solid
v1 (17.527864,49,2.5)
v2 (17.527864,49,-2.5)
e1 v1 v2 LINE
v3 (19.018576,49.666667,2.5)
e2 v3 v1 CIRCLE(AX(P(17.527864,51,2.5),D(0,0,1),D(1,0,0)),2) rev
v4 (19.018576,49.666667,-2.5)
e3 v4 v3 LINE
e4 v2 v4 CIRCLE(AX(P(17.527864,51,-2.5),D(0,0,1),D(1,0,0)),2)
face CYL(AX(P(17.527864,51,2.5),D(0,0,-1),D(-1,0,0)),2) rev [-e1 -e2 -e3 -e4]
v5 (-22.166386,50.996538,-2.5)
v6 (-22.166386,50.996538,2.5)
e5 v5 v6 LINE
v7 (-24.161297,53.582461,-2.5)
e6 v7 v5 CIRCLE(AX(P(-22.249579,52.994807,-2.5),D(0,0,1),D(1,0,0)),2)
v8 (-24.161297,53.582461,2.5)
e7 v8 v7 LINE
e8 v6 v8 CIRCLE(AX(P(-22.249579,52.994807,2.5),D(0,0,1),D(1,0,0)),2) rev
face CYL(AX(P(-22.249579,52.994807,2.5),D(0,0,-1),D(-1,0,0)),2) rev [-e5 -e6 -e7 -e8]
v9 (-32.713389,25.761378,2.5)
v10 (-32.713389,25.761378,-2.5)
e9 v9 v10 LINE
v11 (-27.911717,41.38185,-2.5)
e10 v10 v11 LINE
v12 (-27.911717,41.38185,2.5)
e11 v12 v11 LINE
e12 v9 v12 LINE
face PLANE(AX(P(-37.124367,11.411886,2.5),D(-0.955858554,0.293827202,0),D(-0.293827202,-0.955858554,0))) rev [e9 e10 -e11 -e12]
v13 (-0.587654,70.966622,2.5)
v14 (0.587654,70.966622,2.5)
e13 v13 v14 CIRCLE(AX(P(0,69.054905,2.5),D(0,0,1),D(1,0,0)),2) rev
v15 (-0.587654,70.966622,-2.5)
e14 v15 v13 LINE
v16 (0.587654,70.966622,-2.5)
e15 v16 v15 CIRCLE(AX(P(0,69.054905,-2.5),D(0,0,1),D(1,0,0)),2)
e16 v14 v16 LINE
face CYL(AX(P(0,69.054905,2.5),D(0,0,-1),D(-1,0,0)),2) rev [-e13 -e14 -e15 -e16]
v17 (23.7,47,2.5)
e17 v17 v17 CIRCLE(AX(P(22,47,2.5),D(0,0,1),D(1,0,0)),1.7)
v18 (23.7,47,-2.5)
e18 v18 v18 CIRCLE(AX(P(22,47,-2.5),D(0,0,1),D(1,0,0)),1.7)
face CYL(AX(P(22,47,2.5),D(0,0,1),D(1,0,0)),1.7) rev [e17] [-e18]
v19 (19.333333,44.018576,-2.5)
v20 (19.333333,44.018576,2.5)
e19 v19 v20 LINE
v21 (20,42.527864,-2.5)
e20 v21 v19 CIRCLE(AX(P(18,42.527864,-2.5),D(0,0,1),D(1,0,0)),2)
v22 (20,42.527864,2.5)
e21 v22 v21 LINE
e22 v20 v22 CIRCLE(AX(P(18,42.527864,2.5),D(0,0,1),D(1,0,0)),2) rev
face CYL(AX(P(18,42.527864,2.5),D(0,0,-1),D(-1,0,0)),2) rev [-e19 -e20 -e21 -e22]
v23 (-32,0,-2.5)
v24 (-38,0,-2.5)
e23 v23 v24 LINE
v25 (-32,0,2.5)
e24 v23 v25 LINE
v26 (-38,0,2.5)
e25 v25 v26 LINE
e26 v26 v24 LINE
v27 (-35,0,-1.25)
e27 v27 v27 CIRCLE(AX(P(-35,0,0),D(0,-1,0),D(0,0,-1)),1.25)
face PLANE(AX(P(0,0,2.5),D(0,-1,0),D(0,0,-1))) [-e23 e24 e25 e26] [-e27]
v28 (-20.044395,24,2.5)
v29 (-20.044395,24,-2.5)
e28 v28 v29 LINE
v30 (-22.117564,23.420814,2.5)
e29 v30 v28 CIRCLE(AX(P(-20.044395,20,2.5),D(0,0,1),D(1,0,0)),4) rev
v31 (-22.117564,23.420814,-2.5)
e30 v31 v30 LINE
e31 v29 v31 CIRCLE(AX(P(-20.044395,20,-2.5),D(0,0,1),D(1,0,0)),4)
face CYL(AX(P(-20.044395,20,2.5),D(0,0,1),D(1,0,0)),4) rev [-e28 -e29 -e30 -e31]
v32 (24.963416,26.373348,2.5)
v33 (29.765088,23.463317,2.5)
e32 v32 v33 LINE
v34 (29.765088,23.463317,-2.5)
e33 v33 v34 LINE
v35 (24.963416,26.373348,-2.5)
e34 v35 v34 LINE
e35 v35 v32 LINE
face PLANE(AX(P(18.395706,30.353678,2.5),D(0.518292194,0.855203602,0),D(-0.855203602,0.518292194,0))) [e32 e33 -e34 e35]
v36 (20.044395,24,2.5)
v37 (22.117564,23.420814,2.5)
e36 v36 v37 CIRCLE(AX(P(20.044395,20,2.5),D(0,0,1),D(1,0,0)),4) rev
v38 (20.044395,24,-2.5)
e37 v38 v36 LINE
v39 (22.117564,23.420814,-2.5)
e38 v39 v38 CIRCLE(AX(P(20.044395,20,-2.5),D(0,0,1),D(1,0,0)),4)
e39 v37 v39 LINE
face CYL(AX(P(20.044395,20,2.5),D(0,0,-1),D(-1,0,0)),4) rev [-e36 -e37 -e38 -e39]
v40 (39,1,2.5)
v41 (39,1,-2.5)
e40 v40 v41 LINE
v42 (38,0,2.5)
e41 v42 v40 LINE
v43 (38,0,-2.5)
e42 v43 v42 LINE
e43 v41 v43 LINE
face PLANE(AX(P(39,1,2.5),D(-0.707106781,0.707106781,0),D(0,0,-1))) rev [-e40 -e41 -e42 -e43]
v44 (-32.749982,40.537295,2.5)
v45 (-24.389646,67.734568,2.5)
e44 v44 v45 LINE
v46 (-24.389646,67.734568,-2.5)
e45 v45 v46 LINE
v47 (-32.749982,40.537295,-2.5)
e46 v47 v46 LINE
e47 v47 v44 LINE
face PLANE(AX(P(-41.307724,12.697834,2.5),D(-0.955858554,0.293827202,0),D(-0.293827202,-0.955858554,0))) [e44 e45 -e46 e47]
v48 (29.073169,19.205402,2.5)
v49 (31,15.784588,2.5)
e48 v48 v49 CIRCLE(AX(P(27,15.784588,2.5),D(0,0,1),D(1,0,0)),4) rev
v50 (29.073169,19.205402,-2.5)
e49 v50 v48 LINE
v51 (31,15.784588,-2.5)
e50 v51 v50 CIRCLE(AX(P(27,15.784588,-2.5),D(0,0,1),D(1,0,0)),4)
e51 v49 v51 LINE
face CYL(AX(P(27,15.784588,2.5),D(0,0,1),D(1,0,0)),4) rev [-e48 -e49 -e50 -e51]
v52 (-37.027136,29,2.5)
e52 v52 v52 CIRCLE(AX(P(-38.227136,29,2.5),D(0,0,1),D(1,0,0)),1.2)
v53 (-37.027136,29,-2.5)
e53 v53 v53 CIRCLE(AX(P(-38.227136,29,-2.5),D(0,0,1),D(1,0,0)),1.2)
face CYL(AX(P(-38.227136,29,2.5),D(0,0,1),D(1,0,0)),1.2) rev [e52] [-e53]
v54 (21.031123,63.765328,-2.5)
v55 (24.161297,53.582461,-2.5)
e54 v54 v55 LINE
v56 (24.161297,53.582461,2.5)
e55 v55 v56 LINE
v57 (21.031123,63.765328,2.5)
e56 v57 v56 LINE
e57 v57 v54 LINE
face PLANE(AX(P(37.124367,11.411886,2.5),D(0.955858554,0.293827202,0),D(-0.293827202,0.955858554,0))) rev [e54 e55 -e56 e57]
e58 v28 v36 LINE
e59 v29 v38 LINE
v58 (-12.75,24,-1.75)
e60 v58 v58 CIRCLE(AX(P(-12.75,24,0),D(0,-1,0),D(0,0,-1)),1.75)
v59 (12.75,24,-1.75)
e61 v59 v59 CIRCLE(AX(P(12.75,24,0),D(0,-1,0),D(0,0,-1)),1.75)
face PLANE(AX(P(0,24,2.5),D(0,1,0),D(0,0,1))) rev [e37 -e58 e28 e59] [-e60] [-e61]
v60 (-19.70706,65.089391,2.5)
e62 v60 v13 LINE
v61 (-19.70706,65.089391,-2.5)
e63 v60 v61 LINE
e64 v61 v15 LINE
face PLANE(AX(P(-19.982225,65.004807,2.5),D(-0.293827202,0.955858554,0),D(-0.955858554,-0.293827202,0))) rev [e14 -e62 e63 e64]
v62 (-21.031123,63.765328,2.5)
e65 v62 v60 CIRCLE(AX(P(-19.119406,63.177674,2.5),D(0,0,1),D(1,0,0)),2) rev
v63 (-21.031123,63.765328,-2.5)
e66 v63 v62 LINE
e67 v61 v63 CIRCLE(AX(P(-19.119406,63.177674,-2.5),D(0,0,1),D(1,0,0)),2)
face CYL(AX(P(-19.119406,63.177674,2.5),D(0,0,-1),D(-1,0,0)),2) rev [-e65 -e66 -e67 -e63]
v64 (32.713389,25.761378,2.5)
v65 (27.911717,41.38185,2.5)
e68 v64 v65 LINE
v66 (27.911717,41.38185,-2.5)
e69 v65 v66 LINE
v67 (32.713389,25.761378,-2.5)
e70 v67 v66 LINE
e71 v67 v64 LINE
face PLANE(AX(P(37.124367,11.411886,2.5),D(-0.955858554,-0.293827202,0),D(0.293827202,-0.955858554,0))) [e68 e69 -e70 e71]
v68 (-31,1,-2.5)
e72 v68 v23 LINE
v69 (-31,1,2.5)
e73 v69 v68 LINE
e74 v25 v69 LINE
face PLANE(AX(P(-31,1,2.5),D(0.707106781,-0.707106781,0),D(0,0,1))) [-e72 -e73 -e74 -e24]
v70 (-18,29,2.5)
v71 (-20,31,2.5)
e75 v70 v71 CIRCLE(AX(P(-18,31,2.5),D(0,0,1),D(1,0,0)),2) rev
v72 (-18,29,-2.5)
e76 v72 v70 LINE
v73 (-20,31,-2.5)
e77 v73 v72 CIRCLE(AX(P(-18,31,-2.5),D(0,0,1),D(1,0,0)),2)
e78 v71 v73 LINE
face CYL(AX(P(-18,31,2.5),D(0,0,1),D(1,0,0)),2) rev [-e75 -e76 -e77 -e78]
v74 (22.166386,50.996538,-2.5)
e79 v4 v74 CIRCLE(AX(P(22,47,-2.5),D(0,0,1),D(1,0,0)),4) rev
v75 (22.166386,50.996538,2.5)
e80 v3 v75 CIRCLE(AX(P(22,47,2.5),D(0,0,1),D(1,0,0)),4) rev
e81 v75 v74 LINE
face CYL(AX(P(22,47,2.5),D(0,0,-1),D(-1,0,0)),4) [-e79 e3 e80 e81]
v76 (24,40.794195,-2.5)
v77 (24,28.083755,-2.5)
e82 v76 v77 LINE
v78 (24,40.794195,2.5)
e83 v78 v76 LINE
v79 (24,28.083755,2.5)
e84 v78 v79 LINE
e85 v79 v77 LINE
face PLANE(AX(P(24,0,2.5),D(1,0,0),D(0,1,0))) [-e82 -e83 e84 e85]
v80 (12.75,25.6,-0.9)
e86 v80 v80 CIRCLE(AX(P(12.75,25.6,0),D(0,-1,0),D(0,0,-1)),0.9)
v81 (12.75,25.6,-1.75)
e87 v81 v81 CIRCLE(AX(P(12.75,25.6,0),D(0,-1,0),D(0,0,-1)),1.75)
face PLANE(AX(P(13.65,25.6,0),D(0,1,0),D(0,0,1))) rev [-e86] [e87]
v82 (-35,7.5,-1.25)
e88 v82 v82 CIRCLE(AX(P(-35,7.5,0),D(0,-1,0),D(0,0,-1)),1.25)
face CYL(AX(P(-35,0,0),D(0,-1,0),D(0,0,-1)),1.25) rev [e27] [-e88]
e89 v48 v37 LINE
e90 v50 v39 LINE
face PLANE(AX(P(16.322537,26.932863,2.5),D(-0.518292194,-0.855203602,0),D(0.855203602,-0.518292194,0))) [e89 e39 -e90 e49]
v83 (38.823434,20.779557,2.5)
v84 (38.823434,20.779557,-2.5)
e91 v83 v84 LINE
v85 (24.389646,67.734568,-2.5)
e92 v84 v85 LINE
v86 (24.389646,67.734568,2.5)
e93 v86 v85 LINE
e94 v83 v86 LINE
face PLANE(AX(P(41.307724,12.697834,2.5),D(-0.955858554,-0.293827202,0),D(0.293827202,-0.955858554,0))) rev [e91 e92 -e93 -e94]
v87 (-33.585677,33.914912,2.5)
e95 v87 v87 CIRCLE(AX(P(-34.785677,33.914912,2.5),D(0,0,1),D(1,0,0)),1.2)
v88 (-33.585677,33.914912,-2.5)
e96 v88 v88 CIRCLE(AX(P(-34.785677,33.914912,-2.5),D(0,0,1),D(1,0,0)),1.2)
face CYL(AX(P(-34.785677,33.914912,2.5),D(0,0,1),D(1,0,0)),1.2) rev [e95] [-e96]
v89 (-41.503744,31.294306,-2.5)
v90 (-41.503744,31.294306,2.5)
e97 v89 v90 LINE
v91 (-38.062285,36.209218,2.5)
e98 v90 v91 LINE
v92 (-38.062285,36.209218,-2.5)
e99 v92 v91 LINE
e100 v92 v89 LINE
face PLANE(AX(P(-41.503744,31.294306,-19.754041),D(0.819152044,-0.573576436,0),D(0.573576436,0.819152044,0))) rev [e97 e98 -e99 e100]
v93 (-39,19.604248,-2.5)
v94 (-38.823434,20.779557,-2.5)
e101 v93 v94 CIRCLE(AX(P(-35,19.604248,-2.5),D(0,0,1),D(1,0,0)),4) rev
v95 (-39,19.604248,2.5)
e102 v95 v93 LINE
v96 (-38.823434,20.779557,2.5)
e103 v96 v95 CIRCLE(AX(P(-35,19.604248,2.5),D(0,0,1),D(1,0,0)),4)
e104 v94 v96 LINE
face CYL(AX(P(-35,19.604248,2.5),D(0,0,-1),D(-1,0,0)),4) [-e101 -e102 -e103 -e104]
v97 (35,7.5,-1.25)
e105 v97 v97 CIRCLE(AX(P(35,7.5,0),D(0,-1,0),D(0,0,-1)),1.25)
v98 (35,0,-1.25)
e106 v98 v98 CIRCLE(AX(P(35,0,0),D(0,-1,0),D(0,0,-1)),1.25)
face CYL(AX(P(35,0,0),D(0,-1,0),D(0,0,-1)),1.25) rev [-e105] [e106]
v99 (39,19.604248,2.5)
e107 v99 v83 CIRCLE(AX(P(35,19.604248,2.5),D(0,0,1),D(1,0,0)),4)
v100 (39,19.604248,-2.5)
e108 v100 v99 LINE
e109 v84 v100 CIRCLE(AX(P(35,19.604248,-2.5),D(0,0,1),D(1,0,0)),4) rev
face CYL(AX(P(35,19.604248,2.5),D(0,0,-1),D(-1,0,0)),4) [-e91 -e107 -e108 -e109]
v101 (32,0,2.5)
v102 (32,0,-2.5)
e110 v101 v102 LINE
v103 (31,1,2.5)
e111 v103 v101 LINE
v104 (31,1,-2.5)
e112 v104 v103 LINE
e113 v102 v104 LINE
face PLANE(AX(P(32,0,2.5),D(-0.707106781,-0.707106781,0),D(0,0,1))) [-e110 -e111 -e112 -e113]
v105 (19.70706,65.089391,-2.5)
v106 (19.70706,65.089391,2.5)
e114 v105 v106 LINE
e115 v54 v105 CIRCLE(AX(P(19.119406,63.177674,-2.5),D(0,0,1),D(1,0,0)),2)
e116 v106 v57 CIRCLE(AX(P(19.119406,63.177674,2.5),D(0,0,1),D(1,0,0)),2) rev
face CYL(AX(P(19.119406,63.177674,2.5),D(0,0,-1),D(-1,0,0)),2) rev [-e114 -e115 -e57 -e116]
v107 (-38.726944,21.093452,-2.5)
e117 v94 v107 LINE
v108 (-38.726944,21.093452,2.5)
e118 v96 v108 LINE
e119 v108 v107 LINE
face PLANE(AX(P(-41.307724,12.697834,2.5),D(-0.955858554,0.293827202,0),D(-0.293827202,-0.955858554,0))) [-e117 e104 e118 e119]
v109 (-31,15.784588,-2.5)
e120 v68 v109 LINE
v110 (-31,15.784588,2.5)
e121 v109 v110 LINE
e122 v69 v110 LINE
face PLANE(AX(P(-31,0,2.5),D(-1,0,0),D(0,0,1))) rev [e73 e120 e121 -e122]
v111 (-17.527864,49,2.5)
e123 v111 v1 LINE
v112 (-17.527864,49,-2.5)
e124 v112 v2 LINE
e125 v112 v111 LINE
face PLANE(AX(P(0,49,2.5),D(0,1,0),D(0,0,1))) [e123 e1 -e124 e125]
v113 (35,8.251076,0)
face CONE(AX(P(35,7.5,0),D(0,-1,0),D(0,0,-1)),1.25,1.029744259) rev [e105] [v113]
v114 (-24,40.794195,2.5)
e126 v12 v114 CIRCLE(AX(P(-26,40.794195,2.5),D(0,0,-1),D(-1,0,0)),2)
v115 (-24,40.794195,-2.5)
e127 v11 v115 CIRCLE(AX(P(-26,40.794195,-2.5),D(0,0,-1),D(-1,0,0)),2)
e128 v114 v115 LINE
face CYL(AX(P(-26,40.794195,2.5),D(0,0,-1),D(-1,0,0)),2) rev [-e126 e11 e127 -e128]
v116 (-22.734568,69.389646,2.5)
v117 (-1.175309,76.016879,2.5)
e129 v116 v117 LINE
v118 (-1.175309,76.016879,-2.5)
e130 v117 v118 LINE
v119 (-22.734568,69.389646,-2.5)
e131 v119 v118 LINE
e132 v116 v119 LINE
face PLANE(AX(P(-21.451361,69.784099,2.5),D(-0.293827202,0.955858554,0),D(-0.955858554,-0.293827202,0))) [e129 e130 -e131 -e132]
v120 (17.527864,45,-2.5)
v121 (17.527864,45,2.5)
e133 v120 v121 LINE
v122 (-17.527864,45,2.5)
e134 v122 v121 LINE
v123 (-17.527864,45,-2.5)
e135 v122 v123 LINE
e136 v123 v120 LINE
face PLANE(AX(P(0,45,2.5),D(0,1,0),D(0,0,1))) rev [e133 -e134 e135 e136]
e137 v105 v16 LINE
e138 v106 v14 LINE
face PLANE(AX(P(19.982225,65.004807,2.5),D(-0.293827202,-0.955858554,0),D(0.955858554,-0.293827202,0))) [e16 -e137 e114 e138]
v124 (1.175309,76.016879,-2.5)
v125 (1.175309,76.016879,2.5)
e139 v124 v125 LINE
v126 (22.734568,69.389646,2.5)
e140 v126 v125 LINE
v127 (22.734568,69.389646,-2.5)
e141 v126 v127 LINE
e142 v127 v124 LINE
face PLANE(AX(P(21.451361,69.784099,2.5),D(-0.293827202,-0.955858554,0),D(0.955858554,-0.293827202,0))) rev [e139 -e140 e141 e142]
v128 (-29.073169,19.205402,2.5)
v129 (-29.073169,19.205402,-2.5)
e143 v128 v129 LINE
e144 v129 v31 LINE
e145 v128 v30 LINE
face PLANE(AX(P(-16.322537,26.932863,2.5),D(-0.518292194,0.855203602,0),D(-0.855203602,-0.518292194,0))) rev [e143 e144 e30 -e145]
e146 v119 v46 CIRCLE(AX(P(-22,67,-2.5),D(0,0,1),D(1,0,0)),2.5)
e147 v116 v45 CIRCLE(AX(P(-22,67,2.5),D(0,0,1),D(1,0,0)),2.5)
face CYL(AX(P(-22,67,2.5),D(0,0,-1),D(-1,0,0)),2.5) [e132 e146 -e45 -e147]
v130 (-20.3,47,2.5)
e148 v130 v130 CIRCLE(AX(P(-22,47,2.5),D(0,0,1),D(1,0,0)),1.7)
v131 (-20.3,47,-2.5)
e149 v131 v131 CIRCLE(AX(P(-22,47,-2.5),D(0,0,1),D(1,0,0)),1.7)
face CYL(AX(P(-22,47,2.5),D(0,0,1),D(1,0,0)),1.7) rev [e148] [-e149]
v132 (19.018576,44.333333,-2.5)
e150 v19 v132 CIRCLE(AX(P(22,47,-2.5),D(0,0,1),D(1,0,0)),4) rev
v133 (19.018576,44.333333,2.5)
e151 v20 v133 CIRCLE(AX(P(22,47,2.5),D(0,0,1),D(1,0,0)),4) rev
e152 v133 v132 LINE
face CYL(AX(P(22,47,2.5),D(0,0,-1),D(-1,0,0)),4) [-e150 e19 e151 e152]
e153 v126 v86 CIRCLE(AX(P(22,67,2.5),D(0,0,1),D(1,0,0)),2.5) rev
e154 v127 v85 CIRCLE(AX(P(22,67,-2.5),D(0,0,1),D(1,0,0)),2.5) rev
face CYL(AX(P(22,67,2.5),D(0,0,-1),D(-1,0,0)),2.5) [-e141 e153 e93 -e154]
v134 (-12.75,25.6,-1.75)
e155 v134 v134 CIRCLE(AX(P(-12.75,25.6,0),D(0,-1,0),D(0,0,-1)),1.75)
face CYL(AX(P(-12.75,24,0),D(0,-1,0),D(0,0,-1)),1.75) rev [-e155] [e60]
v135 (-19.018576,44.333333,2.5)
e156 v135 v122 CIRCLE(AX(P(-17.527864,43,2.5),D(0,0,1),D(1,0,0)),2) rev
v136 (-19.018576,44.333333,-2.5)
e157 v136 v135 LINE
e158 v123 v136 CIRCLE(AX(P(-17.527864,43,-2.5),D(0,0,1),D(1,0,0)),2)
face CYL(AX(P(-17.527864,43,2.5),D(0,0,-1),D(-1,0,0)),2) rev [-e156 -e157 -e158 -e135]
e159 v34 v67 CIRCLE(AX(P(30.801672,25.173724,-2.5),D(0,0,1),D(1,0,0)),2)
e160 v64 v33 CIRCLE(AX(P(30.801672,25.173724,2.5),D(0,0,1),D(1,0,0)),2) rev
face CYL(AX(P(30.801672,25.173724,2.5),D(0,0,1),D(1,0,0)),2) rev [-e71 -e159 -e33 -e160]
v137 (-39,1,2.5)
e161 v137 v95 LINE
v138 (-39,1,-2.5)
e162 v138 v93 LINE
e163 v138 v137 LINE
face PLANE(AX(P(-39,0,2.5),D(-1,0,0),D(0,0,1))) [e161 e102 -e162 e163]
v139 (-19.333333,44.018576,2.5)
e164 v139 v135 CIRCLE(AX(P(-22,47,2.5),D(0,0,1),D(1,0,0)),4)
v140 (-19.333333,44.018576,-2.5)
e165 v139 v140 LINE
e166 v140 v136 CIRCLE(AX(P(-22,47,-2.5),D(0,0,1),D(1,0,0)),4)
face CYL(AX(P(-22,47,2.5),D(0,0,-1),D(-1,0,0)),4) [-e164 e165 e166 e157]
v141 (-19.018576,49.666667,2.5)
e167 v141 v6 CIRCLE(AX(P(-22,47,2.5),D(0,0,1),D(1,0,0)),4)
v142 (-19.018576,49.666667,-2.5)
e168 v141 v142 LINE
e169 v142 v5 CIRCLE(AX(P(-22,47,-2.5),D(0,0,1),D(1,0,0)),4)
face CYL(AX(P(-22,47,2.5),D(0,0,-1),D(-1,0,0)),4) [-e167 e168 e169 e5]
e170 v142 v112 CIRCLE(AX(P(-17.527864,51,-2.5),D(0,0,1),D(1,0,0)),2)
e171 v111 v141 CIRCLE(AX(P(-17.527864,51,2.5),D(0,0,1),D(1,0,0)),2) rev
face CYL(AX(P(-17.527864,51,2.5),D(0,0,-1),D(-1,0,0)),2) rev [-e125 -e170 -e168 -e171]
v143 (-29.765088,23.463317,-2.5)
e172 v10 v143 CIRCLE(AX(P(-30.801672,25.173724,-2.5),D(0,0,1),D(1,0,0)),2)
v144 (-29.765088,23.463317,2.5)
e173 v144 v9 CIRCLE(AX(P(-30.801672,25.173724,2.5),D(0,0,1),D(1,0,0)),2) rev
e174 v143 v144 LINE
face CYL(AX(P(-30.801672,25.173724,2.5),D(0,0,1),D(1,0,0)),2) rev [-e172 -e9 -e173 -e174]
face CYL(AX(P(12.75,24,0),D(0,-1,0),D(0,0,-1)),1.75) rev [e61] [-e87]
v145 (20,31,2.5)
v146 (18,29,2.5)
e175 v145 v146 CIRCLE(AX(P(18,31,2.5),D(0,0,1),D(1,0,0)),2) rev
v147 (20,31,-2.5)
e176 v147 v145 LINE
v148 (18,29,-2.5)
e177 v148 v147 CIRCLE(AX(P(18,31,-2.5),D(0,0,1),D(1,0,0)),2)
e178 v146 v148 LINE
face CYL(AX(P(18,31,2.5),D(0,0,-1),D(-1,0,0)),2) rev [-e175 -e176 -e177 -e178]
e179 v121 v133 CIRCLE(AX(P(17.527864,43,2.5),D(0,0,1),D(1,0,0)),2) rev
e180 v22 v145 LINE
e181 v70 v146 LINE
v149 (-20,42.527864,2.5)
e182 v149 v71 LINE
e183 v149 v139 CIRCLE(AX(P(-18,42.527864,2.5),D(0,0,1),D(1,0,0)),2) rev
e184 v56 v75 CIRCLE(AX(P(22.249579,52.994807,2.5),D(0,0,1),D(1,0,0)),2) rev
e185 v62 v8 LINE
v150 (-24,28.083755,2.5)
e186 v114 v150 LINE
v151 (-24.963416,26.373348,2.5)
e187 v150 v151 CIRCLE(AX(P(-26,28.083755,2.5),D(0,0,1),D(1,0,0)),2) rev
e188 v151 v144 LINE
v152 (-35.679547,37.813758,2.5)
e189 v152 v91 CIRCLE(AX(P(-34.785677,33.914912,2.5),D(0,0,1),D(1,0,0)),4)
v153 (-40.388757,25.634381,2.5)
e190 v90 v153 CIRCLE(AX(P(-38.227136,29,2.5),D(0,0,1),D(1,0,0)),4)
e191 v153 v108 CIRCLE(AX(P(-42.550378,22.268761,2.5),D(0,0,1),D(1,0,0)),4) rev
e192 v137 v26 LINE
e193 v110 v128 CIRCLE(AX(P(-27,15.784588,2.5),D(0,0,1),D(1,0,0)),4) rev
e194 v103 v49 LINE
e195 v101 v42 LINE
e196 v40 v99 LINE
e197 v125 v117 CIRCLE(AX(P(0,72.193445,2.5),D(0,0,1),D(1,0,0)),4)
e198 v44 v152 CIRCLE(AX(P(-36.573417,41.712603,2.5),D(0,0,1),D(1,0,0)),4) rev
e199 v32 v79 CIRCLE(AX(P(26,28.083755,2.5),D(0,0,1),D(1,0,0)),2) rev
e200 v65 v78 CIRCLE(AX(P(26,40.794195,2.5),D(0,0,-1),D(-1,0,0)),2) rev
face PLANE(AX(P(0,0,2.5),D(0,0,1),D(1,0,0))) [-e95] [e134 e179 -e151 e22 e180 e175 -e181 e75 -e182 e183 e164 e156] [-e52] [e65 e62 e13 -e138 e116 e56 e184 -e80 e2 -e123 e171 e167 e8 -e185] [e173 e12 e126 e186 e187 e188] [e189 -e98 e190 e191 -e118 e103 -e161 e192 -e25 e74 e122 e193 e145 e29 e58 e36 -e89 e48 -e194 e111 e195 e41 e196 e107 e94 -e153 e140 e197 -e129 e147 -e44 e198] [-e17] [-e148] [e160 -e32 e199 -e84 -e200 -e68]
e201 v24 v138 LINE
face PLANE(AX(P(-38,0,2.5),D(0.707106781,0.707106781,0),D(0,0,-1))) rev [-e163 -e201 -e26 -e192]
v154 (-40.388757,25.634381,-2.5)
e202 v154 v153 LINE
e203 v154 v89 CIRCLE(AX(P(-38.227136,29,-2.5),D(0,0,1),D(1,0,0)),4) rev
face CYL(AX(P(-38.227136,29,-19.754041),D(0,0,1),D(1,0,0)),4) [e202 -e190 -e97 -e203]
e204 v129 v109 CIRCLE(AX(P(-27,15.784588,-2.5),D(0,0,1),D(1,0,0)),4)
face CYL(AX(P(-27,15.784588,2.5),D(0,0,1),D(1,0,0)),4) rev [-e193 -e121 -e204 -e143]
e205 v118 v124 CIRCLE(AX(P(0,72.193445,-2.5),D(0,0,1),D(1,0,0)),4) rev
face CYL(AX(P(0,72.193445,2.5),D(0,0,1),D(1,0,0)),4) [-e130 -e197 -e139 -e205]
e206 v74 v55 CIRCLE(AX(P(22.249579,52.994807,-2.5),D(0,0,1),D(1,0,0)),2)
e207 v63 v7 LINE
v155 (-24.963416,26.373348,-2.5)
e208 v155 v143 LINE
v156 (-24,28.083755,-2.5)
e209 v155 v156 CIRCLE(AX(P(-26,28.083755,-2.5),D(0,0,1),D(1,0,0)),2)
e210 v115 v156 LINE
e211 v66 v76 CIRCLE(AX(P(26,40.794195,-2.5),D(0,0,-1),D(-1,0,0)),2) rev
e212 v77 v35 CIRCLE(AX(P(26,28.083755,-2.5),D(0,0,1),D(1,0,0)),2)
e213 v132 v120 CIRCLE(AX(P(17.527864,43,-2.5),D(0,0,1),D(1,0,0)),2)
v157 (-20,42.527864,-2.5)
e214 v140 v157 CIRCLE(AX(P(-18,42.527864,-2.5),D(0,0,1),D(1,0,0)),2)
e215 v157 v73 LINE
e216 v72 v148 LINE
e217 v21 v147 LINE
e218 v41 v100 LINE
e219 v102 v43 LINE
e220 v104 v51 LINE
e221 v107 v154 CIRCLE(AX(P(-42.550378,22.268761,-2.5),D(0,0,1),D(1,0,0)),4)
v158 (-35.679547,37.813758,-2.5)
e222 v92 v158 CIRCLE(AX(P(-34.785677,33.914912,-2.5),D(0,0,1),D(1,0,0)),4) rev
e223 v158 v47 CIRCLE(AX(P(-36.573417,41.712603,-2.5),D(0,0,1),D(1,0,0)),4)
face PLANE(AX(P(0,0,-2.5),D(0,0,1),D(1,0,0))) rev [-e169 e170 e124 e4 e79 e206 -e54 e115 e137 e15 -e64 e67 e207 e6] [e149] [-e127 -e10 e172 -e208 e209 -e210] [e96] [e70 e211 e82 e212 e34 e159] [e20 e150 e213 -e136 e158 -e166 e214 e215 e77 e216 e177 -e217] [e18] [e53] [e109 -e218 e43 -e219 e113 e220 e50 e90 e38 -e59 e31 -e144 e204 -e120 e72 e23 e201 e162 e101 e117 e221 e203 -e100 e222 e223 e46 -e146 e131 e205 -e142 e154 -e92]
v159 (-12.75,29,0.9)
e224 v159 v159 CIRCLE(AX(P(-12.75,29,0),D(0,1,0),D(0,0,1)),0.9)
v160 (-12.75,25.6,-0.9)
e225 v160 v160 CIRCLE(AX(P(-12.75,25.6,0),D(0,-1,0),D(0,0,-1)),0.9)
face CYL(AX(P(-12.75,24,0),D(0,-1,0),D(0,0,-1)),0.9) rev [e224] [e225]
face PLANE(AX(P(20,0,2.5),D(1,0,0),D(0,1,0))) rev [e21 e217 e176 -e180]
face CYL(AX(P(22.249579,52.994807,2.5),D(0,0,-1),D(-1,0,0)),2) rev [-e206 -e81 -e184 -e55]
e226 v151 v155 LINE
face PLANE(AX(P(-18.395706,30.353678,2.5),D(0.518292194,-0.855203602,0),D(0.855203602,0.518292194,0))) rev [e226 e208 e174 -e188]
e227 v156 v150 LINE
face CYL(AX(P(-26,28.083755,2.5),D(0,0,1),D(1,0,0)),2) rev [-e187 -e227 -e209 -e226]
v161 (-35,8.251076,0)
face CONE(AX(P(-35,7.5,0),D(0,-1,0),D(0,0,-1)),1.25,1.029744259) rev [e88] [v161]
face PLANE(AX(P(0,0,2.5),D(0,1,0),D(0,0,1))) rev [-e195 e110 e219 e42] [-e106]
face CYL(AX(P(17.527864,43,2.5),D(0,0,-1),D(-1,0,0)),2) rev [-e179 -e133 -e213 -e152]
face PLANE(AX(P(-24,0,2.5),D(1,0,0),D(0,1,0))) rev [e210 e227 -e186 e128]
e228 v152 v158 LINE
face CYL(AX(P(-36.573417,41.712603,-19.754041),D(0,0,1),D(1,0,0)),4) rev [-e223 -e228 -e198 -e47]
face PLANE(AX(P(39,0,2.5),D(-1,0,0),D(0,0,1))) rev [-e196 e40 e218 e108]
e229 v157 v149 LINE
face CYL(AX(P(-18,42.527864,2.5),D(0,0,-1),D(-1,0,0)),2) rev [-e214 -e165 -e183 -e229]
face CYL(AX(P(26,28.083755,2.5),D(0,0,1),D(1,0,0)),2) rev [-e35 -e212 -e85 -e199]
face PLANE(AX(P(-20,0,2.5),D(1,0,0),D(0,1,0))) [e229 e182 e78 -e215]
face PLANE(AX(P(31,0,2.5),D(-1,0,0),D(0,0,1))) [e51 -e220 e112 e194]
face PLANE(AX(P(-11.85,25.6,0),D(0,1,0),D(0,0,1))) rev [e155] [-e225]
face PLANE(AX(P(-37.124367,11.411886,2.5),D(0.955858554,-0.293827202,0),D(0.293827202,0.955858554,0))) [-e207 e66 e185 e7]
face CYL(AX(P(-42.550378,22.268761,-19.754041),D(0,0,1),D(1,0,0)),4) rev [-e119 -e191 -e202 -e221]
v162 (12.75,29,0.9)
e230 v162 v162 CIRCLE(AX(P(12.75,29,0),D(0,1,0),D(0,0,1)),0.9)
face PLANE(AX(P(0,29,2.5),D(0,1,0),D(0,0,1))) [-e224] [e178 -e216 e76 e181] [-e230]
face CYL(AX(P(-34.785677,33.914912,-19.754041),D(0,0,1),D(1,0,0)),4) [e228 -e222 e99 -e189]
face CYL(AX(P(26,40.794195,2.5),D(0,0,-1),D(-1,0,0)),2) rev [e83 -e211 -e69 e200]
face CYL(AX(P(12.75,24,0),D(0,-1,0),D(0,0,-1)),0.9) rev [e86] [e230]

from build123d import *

# Parameters (mm, degrees)
BOSS_EXTRUDE3_DEPTH              = 2.5
FILLET3_R                        = 2
CUT_EXTRUDE1_DEPTH               = 86.90473786
FILLET1_R                        = 2
FILLET2_R                        = 4
M3_CLEARANCE_HOLE1_D             = 3.4
M3X0_5_TAPPED_HOLE1_D            = 2.5
M3X0_5_TAPPED_HOLE1_DEPTH        = 7.5
M3X0_5_TAPPED_HOLE1_TIP          = 0.751075774
CHAMFER1_SIZE                    = 1
CBORE_FOR_M1_6_SHCS1_D           = 1.8
CBORE_FOR_M1_6_SHCS1_DEPTH       = 5
CBORE_FOR_M1_6_SHCS1_CBORE_D     = 3.5
CBORE_FOR_M1_6_SHCS1_CBORE_DEPTH = 1.6
BOSS_EXTRUDE4_DEPTH              = 5
FILLET4_R                        = 4
M2_CLEARANCE_HOLE1_D             = 2.4
M2_CLEARANCE_HOLE1_DEPTH         = 7.5
M2_CLEARANCE_HOLE1_TIP           = 0.721032743


with BuildPart() as part:
    # Sketch1 → Boss-Extrude3 (new, symmetric)
    with BuildSketch(Plane.XY):
        with BuildLine():
            Line((-39, 0), (-31, 0))
            Line((-31, 0), (-31, 18.037654982))
            Line((-31, 18.037654982), (-21.161883591, 24))
            Line((-21.161883591, 24), (21.161883591, 24))
            Line((21.161883591, 24), (31, 18.037654982))
            Line((31, 18.037654982), (31, 0))
            Line((31, 0), (39, 0))
            Line((39, 0), (39, 20.205165085))
            Line((39, 20.205165085), (24.389646385, 67.734568005))
            ThreePointArc((24.389646385, 67.734568005), (23.767766953, 68.767766953), (22.734568005, 69.389646385))
            Line((22.734568005, 69.389646385), (0, 76.378164175))
            Line((0, 76.378164175), (-22.734568005, 69.389646385))
            ThreePointArc((-22.734568005, 69.389646385), (-23.767766953, 68.767766953), (-24.389646385, 67.734568005))
            Line((-24.389646385, 67.734568005), (-39, 20.205165085))
            Line((-39, 20.205165085), (-39, 0))
        make_face()
        with BuildLine():
            Line((-20, 29), (-20, 43.535898385))
            ThreePointArc((-20, 43.535898385), (-19.171572875, 44.171572875), (-18.535898385, 45))
            Line((-18.535898385, 45), (18.535898385, 45))
            ThreePointArc((18.535898385, 45), (19.171572875, 44.171572875), (20, 43.535898385))
            Line((20, 43.535898385), (20, 29))
            Line((20, 29), (-20, 29))
        make_face(mode=Mode.SUBTRACT)
        with BuildLine():
            Line((18.535898385, 49), (-18.535898385, 49))
            ThreePointArc((-18.535898385, 49), (-22.449787583, 50.974630943), (-25.823434216, 48.175308809))
            Line((-25.823434216, 48.175308809), (-20.719808061, 64.77807629))
            Line((-20.719808061, 64.77807629), (0, 71.147264708))
            Line((0, 71.147264708), (20.719808061, 64.77807629))
            Line((20.719808061, 64.77807629), (25.823434216, 48.175308809))
            ThreePointArc((25.823434216, 48.175308809), (22.449787583, 50.974630943), (18.535898385, 49))
        make_face(mode=Mode.SUBTRACT)
    extrude(amount=BOSS_EXTRUDE3_DEPTH, both=True)

    # Fillet3
    fillet3_edges = [part.edges().sort_by_distance(p)[0] for p in [
        (-18.535898385, 45, 0),
        (-20, 43.535898385, 0),
        (-20, 29, 0),
        (20, 29, 0),
        (20, 43.535898385, 0),
        (18.535898385, 45, 0),
        (20.719808061, 64.77807629, 0),
        (0, 71.147264708, 0),
        (-20.719808061, 64.77807629, 0),
        (-25.823434216, 48.175308809, 0),
        (-18.535898385, 49, 0),
        (18.535898385, 49, 0),
    ]]
    fillet(fillet3_edges, radius=FILLET3_R - 0.0004)  # a hair under: the kernel refuses the full size
    fillet3_2_edges = [part.edges().sort_by_distance(p)[0] for p in [
        (25.823434216, 48.175308809, 0),
    ]]
    fillet(fillet3_2_edges, radius=FILLET3_R)

    # Sketch2 → Cut-Extrude1 (cut, through all)
    with BuildSketch(Plane(origin=(0, 0, -2.5), x_dir=(-1, 0, 0), z_dir=(0, 0, -1))):
        with BuildLine():
            Line((-27.911717108, 41.381849759), (-34.256545, 20.741289696))
            Line((-34.256545, 20.741289696), (-24, 26.957221429))
            Line((-24, 26.957221429), (-24, 40.794195355))
            ThreePointArc((-24, 40.794195355), (-25.702875629, 42.77200149), (-27.911717108, 41.381849759))
        make_face()
        with BuildLine():
            Line((24, 26.957221429), (34.256545, 20.741289696))
            Line((34.256545, 20.741289696), (27.911717108, 41.381849759))
            ThreePointArc((27.911717108, 41.381849759), (25.702875629, 42.77200149), (24, 40.794195355))
            Line((24, 40.794195355), (24, 26.957221429))
        make_face()
    extrude(amount=-CUT_EXTRUDE1_DEPTH, mode=Mode.SUBTRACT)

    # Fillet1
    fillet1_edges = [part.edges().sort_by_distance(p)[0] for p in [
        (24, 26.957221429, 0),
        (34.256545, 20.741289696, 0),
        (-34.256545, 20.741289696, 0),
        (-24, 26.957221429, 0),
    ]]
    fillet(fillet1_edges, radius=FILLET1_R)

    # Fillet2
    fillet2_edges = [part.edges().sort_by_distance(p)[0] for p in [
        (39, 20.205165085, 0),
        (31, 18.037654982, 0),
        (21.161883591, 24, 0),
        (-21.161883591, 24, 0),
        (-31, 18.037654982, 0),
        (-39, 20.205165085, 0),
        (0, 76.378164175, 0),
    ]]
    fillet(fillet2_edges, radius=FILLET2_R)

    # M3 Clearance Hole1 (through all)
    with Locations(Plane.XY.offset(2.5)):
        with Locations((-22, 47), (22, 47)):
            Hole(M3_CLEARANCE_HOLE1_D / 2)

    # M3x0.5 Tapped Hole1
    with Locations(Plane(origin=(0, 0, 0), x_dir=(-1, 0, 0), z_dir=(0, -1, 0))):
        with Locations((-35, 0), (35, 0)):
            Hole(M3X0_5_TAPPED_HOLE1_D / 2, depth=M3X0_5_TAPPED_HOLE1_DEPTH)
            with Locations((0, 0, -(M3X0_5_TAPPED_HOLE1_DEPTH + M3X0_5_TAPPED_HOLE1_TIP / 2))):  # 118° drill point
                Cone(0, M3X0_5_TAPPED_HOLE1_D / 2, M3X0_5_TAPPED_HOLE1_TIP, mode=Mode.SUBTRACT)

    # Chamfer1
    chamfer1_edges = [part.edges().sort_by_distance(p)[0] for p in [
        (39, 0, 0),
        (31, 0, 0),
        (-31, 0, 0),
        (-39, 0, 0),
    ]]
    chamfer(chamfer1_edges, length=CHAMFER1_SIZE)

    # CBORE for M1.6 SHCS1
    with Locations(Plane(origin=(0, 24, 0), x_dir=(-1, 0, 0), z_dir=(0, -1, 0))):
        with Locations((12.75, 0), (-12.75, 0)):
            CounterBoreHole(CBORE_FOR_M1_6_SHCS1_D / 2, CBORE_FOR_M1_6_SHCS1_CBORE_D / 2, CBORE_FOR_M1_6_SHCS1_CBORE_DEPTH, depth=CBORE_FOR_M1_6_SHCS1_DEPTH)

    # Sketch12 → Boss-Extrude4 (add)
    with BuildSketch(Plane.XY.offset(2.5)):
        with BuildLine():
            Line((-41.503743829, 31.294305745), (-38.062285211, 36.209218011))
            ThreePointArc((-38.062285211, 36.209218011), (-32.491371289, 37.191520443), (-31.509068857, 31.62060652))
            Line((-31.509068857, 31.62060652), (-34.950527475, 26.705694255))
            ThreePointArc((-34.950527475, 26.705694255), (-40.521441398, 25.723391823), (-41.503743829, 31.294305745))
        make_face()
    extrude(amount=-BOSS_EXTRUDE4_DEPTH)

    # Fillet4
    fillet4_edges = [part.edges().sort_by_distance(p)[0] for p in [
        (-33.610368225, 37.738346482, 0),
        (-37.505935548, 25.065553354, 0),
    ]]
    fillet(fillet4_edges, radius=FILLET4_R)

    # M2 Clearance Hole1
    with Locations(Plane.XY.offset(2.5)):
        with Locations((-38.227135652, 29), (-34.785677034, 33.914912266)):
            Hole(M2_CLEARANCE_HOLE1_D / 2, depth=M2_CLEARANCE_HOLE1_DEPTH)
            with Locations((0, 0, -(M2_CLEARANCE_HOLE1_DEPTH + M2_CLEARANCE_HOLE1_TIP / 2))):  # 118° drill point
                Cone(0, M2_CLEARANCE_HOLE1_D / 2, M2_CLEARANCE_HOLE1_TIP, mode=Mode.SUBTRACT)


solid = part.part
